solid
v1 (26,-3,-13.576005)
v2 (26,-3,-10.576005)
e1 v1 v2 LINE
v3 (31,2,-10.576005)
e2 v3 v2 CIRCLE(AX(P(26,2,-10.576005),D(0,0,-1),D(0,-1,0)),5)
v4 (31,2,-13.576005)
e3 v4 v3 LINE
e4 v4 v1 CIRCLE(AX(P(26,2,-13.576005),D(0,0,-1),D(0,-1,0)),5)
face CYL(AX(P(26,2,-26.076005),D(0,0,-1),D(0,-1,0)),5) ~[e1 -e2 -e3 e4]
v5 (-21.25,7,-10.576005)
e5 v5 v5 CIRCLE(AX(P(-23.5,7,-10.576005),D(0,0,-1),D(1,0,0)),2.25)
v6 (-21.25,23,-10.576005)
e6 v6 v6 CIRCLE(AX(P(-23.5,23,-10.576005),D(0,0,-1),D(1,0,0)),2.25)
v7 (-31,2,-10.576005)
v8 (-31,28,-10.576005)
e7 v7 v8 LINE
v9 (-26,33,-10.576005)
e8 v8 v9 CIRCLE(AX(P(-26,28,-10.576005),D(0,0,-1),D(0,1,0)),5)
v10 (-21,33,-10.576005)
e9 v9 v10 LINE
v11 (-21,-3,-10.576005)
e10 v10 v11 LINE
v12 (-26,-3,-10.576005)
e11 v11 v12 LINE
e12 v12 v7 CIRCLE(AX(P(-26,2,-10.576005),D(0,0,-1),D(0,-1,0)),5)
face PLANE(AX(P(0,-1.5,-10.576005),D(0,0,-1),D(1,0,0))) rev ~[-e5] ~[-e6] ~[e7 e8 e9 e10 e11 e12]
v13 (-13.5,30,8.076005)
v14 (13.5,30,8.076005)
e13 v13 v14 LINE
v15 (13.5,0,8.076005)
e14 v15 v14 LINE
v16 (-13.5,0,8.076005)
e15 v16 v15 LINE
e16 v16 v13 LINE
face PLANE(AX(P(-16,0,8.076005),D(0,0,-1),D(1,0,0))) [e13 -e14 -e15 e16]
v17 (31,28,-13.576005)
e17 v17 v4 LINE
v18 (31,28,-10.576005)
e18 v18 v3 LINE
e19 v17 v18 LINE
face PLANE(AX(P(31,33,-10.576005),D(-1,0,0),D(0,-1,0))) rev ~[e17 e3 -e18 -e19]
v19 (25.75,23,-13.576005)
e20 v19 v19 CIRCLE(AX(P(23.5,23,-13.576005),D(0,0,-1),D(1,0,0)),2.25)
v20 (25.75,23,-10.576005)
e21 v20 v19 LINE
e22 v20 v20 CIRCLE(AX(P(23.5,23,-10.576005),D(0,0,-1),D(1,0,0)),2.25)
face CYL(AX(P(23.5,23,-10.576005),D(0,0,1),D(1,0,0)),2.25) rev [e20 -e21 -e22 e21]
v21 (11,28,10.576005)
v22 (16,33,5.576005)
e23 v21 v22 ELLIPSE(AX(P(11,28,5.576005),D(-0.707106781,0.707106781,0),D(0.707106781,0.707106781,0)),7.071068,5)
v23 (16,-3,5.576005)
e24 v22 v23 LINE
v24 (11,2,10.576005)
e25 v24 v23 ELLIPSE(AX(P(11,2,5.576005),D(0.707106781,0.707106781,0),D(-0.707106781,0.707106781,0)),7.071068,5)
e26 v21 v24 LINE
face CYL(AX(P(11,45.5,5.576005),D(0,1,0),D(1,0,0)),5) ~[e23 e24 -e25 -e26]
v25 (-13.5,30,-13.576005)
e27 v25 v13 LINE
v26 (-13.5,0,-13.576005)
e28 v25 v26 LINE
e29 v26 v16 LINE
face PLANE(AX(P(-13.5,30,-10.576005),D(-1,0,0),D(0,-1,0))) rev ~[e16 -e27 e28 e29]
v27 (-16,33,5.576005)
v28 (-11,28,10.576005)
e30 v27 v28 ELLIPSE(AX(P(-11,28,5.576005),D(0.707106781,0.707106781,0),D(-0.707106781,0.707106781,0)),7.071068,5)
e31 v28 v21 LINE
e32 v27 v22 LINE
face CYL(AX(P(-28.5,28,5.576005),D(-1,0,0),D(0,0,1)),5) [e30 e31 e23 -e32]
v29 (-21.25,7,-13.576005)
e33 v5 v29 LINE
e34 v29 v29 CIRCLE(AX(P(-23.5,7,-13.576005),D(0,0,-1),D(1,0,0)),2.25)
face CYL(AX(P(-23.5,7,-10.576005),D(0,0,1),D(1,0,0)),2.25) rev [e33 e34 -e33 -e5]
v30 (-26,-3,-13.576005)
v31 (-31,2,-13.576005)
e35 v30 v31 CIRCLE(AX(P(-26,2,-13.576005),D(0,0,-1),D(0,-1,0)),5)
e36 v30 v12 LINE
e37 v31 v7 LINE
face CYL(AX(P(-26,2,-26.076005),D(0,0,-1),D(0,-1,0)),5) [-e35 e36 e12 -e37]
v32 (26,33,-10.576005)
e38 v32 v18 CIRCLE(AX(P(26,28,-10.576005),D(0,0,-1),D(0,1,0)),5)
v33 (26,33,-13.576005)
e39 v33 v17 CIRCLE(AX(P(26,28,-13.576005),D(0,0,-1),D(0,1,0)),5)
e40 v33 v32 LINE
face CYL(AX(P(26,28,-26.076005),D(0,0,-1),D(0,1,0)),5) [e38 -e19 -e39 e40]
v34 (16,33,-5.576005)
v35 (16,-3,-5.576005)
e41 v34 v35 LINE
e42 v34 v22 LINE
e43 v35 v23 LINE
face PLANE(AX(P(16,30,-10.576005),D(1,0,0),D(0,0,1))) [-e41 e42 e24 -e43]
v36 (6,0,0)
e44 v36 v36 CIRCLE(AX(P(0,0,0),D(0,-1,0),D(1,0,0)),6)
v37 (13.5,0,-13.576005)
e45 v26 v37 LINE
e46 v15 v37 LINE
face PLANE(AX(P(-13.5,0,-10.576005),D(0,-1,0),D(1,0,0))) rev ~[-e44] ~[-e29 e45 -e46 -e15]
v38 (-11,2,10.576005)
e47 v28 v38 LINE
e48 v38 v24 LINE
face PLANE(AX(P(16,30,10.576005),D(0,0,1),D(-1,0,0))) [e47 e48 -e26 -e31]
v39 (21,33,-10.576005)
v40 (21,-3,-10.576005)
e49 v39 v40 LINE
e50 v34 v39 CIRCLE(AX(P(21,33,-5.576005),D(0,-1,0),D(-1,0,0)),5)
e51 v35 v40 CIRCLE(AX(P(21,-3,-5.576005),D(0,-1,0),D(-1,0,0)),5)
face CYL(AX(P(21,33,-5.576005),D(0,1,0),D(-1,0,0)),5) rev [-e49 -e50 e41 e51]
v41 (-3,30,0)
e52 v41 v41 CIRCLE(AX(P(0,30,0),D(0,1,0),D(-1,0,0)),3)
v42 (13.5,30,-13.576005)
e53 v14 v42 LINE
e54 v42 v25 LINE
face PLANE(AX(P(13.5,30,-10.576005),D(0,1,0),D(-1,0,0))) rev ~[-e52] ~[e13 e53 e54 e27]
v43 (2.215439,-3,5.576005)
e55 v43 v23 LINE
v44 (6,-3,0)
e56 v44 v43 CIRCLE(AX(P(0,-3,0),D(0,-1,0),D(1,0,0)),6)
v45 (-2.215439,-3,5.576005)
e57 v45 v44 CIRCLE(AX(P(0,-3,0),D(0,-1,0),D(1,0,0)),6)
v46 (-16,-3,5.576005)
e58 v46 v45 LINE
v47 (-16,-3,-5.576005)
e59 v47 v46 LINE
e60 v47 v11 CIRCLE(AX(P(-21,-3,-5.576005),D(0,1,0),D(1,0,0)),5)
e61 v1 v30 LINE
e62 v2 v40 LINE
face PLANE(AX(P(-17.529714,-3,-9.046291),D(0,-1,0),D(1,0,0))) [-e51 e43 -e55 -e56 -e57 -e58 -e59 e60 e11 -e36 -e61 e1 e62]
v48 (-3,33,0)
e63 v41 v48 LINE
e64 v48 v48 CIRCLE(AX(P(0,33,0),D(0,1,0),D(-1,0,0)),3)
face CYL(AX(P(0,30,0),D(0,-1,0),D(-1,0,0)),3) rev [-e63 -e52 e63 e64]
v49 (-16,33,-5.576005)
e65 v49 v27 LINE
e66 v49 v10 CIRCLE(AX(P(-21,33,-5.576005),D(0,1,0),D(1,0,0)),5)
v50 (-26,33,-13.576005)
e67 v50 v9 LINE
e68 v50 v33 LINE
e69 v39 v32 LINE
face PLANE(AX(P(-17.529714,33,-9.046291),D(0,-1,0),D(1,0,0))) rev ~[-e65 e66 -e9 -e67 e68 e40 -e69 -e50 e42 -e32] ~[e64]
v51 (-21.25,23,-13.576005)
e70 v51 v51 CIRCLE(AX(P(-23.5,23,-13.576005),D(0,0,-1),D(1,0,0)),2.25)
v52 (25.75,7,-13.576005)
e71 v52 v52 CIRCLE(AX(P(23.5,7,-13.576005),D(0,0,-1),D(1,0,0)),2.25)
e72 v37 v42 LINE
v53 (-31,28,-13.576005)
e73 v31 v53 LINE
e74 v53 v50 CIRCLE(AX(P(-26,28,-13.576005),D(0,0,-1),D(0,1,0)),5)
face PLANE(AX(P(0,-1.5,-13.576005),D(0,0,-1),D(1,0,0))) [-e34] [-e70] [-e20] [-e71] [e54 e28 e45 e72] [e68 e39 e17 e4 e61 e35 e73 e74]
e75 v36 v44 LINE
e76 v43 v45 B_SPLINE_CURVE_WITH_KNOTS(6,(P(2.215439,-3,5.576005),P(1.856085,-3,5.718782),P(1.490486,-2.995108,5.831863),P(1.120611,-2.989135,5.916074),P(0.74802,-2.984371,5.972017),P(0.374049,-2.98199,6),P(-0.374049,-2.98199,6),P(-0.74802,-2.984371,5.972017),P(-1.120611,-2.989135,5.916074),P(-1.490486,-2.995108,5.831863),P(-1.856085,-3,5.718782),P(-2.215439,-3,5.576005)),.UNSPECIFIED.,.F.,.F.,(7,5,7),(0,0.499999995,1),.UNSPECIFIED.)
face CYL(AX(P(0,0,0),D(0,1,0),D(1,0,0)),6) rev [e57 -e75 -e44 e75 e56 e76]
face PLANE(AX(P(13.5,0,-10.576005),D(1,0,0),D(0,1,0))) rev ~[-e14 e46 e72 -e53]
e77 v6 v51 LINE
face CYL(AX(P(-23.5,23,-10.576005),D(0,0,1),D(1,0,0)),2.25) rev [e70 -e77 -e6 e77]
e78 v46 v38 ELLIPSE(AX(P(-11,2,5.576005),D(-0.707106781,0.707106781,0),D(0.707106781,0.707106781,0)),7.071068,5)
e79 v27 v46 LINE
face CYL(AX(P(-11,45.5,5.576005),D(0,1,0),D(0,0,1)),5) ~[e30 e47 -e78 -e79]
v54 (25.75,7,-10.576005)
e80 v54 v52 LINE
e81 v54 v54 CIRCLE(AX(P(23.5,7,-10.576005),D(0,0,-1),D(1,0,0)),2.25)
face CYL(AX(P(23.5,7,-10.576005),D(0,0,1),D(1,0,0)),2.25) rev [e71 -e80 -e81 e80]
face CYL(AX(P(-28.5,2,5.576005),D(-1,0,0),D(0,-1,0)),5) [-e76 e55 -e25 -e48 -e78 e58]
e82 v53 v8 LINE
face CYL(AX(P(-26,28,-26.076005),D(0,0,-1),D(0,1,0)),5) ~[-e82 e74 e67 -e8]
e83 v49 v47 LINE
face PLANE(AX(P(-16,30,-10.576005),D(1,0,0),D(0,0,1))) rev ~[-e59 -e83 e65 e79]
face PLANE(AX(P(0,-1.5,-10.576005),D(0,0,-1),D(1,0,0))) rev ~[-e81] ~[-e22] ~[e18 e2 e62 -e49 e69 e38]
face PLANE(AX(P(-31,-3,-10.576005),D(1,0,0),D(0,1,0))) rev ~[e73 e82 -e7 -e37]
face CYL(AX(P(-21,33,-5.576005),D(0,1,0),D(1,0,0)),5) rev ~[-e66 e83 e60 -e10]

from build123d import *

# Parameters (mm, degrees)
F0_W        = 32
F0_H        = 21.1520095187
F0_R        = 6
F1_DEPTH    = 30
F2_T        = -2.5
F3_DEPTH    = 3
F4_W        = 32
F4_H        = 21.1520095187
F4_R        = 3
F5_DEPTH    = 3
F6_R        = 2.25
F7_DEPTH    = 3
F8_T1_DEPTH = 36
F8_T3_DEPTH = 61
F8_T5_DEPTH = 57
F8_T7_DEPTH = 28


# Not quite as in the source:
# - a fillet or chamfer that OpenCascade refuses, or shapes differently, is made with other operations: its cross-section is extruded or revolved along the edge and cut away or added
# - a feature names something its author has since deleted; it is built from what else it names


with BuildPart() as f1:
    # F0 (on Front) → F1 (new body)
    with BuildSketch(Plane.XZ):
        Rectangle(F0_W, F0_H)
        Circle(F0_R, mode=Mode.SUBTRACT)
        Circle(F0_R)
    extrude(amount=-F1_DEPTH)

    # F2
    f2_openings = [f1.faces().sort_by_distance(p)[0] for p in [
        (0, 0, 0),
        (0, 30, 0),
        (0, 15, -10.576005),
    ]]
    offset(amount=F2_T, openings=f2_openings)

    # F0 (on Front) → F3 (join)
    with BuildSketch(Plane.XZ):
        Rectangle(F0_W, F0_H)
        Circle(F0_R, mode=Mode.SUBTRACT)
    extrude(amount=F3_DEPTH)

    # F4 (on face) → F5 (join)
    with BuildSketch(Plane(origin=(0, 30, 0), x_dir=(-1, 0, 0), z_dir=(0, 1, 0))):
        Rectangle(F4_W, F4_H)
        Circle(F4_R, mode=Mode.SUBTRACT)
    extrude(amount=F5_DEPTH)

    # F6 (on face) → F7 (join)
    with BuildSketch(Plane(origin=(0, 0, -10.5760047594), x_dir=(1, 0, 0), z_dir=(0, 0, -1))):
        Polygon((-16, 3), (-16, 0), (-13.5, 0), (13.5, 0), (16, 0), (16, 3), align=None)
        Polygon((-16, -33), (-16, 0), (-16, 3), (-31, 3), (-31, -33), align=None)
        with Locations((-23.5, -23)):
            Circle(F6_R, mode=Mode.SUBTRACT)
        with Locations((-23.5, -7)):
            Circle(F6_R, mode=Mode.SUBTRACT)
        Polygon((-13.5, 0), (-16, 0), (-16, -33), (16, -33), (16, 0), (13.5, 0), (13.5, -30), (-13.5, -30), align=None)
        Polygon((31, 3), (16, 3), (16, 0), (16, -33), (31, -33), align=None)
        with Locations((23.5, -23)):
            Circle(F6_R, mode=Mode.SUBTRACT)
        with Locations((23.5, -7)):
            Circle(F6_R, mode=Mode.SUBTRACT)
    extrude(amount=F7_DEPTH)

    # F8: fillet of radius 5 on 10 edges, made by hand

    # F8_s2 → F8_t1 (join)
    with BuildSketch(Plane.XZ.offset(-33)):
        with BuildLine():
            ThreePointArc((-16, -5.5760047594), (-17.4644660941, -9.1115386653), (-21, -10.5760047594))
            Line((-21, -10.5760047594), (-16, -10.5760047594))
            Line((-16, -10.5760047594), (-16, -5.5760047594))
        make_face()
        with BuildLine():
            ThreePointArc((16, -5.5760047594), (17.4644660941, -9.1115386653), (21, -10.5760047594))
            Line((21, -10.5760047594), (16, -10.5760047594))
            Line((16, -10.5760047594), (16, -5.5760047594))
        make_face()
    extrude(amount=F8_T1_DEPTH)

    # F8_s4 → F8_t3 (cut)
    with BuildSketch(Plane.XZ.offset(-45.5)):
        with BuildLine():
            ThreePointArc((-11, 10.5760047594), (-14.5355339059, 9.1115386653), (-16, 5.5760047594))
            Line((-16, 5.5760047594), (-16, 10.5760047594))
            Line((-16, 10.5760047594), (-11, 10.5760047594))
        make_face()
        with BuildLine():
            ThreePointArc((16, 5.5760047594), (14.5355339059, 9.1115386653), (11, 10.5760047594))
            Line((11, 10.5760047594), (16, 10.5760047594))
            Line((16, 10.5760047594), (16, 5.5760047594))
        make_face()
    extrude(amount=F8_T3_DEPTH, mode=Mode.SUBTRACT)

    # F8_s6 → F8_t5 (cut)
    with BuildSketch(Plane.YZ.offset(-28.5)):
        with BuildLine():
            ThreePointArc((-3, 5.5760047594), (-1.5355339059, 9.1115386653), (2, 10.5760047594))
            Line((2, 10.5760047594), (-3, 10.5760047594))
            Line((-3, 10.5760047594), (-3, 5.5760047594))
        make_face()
        with BuildLine():
            ThreePointArc((28, 10.5760047594), (31.5355339059, 9.1115386653), (33, 5.5760047594))
            Line((33, 5.5760047594), (33, 10.5760047594))
            Line((33, 10.5760047594), (28, 10.5760047594))
        make_face()
    extrude(amount=F8_T5_DEPTH, mode=Mode.SUBTRACT)

    # F8_s8 → F8_t7 (cut)
    with BuildSketch(Plane.XY.offset(-26.0760047594)):
        with BuildLine():
            ThreePointArc((26, -3), (29.5355339059, -1.5355339059), (31, 2))
            Line((31, 2), (31, -3))
            Line((31, -3), (26, -3))
        make_face()
        with BuildLine():
            ThreePointArc((26, 33), (29.5355339059, 31.5355339059), (31, 28))
            Line((31, 28), (31, 33))
            Line((31, 33), (26, 33))
        make_face()
        with BuildLine():
            ThreePointArc((-26, -3), (-29.5355339059, -1.5355339059), (-31, 2))
            Line((-31, 2), (-31, -3))
            Line((-31, -3), (-26, -3))
        make_face()
        with BuildLine():
            ThreePointArc((-26, 33), (-29.5355339059, 31.5355339059), (-31, 28))
            Line((-31, 28), (-31, 33))
            Line((-31, 33), (-26, 33))
        make_face()
    extrude(amount=F8_T7_DEPTH, mode=Mode.SUBTRACT)


solid = f1.part
